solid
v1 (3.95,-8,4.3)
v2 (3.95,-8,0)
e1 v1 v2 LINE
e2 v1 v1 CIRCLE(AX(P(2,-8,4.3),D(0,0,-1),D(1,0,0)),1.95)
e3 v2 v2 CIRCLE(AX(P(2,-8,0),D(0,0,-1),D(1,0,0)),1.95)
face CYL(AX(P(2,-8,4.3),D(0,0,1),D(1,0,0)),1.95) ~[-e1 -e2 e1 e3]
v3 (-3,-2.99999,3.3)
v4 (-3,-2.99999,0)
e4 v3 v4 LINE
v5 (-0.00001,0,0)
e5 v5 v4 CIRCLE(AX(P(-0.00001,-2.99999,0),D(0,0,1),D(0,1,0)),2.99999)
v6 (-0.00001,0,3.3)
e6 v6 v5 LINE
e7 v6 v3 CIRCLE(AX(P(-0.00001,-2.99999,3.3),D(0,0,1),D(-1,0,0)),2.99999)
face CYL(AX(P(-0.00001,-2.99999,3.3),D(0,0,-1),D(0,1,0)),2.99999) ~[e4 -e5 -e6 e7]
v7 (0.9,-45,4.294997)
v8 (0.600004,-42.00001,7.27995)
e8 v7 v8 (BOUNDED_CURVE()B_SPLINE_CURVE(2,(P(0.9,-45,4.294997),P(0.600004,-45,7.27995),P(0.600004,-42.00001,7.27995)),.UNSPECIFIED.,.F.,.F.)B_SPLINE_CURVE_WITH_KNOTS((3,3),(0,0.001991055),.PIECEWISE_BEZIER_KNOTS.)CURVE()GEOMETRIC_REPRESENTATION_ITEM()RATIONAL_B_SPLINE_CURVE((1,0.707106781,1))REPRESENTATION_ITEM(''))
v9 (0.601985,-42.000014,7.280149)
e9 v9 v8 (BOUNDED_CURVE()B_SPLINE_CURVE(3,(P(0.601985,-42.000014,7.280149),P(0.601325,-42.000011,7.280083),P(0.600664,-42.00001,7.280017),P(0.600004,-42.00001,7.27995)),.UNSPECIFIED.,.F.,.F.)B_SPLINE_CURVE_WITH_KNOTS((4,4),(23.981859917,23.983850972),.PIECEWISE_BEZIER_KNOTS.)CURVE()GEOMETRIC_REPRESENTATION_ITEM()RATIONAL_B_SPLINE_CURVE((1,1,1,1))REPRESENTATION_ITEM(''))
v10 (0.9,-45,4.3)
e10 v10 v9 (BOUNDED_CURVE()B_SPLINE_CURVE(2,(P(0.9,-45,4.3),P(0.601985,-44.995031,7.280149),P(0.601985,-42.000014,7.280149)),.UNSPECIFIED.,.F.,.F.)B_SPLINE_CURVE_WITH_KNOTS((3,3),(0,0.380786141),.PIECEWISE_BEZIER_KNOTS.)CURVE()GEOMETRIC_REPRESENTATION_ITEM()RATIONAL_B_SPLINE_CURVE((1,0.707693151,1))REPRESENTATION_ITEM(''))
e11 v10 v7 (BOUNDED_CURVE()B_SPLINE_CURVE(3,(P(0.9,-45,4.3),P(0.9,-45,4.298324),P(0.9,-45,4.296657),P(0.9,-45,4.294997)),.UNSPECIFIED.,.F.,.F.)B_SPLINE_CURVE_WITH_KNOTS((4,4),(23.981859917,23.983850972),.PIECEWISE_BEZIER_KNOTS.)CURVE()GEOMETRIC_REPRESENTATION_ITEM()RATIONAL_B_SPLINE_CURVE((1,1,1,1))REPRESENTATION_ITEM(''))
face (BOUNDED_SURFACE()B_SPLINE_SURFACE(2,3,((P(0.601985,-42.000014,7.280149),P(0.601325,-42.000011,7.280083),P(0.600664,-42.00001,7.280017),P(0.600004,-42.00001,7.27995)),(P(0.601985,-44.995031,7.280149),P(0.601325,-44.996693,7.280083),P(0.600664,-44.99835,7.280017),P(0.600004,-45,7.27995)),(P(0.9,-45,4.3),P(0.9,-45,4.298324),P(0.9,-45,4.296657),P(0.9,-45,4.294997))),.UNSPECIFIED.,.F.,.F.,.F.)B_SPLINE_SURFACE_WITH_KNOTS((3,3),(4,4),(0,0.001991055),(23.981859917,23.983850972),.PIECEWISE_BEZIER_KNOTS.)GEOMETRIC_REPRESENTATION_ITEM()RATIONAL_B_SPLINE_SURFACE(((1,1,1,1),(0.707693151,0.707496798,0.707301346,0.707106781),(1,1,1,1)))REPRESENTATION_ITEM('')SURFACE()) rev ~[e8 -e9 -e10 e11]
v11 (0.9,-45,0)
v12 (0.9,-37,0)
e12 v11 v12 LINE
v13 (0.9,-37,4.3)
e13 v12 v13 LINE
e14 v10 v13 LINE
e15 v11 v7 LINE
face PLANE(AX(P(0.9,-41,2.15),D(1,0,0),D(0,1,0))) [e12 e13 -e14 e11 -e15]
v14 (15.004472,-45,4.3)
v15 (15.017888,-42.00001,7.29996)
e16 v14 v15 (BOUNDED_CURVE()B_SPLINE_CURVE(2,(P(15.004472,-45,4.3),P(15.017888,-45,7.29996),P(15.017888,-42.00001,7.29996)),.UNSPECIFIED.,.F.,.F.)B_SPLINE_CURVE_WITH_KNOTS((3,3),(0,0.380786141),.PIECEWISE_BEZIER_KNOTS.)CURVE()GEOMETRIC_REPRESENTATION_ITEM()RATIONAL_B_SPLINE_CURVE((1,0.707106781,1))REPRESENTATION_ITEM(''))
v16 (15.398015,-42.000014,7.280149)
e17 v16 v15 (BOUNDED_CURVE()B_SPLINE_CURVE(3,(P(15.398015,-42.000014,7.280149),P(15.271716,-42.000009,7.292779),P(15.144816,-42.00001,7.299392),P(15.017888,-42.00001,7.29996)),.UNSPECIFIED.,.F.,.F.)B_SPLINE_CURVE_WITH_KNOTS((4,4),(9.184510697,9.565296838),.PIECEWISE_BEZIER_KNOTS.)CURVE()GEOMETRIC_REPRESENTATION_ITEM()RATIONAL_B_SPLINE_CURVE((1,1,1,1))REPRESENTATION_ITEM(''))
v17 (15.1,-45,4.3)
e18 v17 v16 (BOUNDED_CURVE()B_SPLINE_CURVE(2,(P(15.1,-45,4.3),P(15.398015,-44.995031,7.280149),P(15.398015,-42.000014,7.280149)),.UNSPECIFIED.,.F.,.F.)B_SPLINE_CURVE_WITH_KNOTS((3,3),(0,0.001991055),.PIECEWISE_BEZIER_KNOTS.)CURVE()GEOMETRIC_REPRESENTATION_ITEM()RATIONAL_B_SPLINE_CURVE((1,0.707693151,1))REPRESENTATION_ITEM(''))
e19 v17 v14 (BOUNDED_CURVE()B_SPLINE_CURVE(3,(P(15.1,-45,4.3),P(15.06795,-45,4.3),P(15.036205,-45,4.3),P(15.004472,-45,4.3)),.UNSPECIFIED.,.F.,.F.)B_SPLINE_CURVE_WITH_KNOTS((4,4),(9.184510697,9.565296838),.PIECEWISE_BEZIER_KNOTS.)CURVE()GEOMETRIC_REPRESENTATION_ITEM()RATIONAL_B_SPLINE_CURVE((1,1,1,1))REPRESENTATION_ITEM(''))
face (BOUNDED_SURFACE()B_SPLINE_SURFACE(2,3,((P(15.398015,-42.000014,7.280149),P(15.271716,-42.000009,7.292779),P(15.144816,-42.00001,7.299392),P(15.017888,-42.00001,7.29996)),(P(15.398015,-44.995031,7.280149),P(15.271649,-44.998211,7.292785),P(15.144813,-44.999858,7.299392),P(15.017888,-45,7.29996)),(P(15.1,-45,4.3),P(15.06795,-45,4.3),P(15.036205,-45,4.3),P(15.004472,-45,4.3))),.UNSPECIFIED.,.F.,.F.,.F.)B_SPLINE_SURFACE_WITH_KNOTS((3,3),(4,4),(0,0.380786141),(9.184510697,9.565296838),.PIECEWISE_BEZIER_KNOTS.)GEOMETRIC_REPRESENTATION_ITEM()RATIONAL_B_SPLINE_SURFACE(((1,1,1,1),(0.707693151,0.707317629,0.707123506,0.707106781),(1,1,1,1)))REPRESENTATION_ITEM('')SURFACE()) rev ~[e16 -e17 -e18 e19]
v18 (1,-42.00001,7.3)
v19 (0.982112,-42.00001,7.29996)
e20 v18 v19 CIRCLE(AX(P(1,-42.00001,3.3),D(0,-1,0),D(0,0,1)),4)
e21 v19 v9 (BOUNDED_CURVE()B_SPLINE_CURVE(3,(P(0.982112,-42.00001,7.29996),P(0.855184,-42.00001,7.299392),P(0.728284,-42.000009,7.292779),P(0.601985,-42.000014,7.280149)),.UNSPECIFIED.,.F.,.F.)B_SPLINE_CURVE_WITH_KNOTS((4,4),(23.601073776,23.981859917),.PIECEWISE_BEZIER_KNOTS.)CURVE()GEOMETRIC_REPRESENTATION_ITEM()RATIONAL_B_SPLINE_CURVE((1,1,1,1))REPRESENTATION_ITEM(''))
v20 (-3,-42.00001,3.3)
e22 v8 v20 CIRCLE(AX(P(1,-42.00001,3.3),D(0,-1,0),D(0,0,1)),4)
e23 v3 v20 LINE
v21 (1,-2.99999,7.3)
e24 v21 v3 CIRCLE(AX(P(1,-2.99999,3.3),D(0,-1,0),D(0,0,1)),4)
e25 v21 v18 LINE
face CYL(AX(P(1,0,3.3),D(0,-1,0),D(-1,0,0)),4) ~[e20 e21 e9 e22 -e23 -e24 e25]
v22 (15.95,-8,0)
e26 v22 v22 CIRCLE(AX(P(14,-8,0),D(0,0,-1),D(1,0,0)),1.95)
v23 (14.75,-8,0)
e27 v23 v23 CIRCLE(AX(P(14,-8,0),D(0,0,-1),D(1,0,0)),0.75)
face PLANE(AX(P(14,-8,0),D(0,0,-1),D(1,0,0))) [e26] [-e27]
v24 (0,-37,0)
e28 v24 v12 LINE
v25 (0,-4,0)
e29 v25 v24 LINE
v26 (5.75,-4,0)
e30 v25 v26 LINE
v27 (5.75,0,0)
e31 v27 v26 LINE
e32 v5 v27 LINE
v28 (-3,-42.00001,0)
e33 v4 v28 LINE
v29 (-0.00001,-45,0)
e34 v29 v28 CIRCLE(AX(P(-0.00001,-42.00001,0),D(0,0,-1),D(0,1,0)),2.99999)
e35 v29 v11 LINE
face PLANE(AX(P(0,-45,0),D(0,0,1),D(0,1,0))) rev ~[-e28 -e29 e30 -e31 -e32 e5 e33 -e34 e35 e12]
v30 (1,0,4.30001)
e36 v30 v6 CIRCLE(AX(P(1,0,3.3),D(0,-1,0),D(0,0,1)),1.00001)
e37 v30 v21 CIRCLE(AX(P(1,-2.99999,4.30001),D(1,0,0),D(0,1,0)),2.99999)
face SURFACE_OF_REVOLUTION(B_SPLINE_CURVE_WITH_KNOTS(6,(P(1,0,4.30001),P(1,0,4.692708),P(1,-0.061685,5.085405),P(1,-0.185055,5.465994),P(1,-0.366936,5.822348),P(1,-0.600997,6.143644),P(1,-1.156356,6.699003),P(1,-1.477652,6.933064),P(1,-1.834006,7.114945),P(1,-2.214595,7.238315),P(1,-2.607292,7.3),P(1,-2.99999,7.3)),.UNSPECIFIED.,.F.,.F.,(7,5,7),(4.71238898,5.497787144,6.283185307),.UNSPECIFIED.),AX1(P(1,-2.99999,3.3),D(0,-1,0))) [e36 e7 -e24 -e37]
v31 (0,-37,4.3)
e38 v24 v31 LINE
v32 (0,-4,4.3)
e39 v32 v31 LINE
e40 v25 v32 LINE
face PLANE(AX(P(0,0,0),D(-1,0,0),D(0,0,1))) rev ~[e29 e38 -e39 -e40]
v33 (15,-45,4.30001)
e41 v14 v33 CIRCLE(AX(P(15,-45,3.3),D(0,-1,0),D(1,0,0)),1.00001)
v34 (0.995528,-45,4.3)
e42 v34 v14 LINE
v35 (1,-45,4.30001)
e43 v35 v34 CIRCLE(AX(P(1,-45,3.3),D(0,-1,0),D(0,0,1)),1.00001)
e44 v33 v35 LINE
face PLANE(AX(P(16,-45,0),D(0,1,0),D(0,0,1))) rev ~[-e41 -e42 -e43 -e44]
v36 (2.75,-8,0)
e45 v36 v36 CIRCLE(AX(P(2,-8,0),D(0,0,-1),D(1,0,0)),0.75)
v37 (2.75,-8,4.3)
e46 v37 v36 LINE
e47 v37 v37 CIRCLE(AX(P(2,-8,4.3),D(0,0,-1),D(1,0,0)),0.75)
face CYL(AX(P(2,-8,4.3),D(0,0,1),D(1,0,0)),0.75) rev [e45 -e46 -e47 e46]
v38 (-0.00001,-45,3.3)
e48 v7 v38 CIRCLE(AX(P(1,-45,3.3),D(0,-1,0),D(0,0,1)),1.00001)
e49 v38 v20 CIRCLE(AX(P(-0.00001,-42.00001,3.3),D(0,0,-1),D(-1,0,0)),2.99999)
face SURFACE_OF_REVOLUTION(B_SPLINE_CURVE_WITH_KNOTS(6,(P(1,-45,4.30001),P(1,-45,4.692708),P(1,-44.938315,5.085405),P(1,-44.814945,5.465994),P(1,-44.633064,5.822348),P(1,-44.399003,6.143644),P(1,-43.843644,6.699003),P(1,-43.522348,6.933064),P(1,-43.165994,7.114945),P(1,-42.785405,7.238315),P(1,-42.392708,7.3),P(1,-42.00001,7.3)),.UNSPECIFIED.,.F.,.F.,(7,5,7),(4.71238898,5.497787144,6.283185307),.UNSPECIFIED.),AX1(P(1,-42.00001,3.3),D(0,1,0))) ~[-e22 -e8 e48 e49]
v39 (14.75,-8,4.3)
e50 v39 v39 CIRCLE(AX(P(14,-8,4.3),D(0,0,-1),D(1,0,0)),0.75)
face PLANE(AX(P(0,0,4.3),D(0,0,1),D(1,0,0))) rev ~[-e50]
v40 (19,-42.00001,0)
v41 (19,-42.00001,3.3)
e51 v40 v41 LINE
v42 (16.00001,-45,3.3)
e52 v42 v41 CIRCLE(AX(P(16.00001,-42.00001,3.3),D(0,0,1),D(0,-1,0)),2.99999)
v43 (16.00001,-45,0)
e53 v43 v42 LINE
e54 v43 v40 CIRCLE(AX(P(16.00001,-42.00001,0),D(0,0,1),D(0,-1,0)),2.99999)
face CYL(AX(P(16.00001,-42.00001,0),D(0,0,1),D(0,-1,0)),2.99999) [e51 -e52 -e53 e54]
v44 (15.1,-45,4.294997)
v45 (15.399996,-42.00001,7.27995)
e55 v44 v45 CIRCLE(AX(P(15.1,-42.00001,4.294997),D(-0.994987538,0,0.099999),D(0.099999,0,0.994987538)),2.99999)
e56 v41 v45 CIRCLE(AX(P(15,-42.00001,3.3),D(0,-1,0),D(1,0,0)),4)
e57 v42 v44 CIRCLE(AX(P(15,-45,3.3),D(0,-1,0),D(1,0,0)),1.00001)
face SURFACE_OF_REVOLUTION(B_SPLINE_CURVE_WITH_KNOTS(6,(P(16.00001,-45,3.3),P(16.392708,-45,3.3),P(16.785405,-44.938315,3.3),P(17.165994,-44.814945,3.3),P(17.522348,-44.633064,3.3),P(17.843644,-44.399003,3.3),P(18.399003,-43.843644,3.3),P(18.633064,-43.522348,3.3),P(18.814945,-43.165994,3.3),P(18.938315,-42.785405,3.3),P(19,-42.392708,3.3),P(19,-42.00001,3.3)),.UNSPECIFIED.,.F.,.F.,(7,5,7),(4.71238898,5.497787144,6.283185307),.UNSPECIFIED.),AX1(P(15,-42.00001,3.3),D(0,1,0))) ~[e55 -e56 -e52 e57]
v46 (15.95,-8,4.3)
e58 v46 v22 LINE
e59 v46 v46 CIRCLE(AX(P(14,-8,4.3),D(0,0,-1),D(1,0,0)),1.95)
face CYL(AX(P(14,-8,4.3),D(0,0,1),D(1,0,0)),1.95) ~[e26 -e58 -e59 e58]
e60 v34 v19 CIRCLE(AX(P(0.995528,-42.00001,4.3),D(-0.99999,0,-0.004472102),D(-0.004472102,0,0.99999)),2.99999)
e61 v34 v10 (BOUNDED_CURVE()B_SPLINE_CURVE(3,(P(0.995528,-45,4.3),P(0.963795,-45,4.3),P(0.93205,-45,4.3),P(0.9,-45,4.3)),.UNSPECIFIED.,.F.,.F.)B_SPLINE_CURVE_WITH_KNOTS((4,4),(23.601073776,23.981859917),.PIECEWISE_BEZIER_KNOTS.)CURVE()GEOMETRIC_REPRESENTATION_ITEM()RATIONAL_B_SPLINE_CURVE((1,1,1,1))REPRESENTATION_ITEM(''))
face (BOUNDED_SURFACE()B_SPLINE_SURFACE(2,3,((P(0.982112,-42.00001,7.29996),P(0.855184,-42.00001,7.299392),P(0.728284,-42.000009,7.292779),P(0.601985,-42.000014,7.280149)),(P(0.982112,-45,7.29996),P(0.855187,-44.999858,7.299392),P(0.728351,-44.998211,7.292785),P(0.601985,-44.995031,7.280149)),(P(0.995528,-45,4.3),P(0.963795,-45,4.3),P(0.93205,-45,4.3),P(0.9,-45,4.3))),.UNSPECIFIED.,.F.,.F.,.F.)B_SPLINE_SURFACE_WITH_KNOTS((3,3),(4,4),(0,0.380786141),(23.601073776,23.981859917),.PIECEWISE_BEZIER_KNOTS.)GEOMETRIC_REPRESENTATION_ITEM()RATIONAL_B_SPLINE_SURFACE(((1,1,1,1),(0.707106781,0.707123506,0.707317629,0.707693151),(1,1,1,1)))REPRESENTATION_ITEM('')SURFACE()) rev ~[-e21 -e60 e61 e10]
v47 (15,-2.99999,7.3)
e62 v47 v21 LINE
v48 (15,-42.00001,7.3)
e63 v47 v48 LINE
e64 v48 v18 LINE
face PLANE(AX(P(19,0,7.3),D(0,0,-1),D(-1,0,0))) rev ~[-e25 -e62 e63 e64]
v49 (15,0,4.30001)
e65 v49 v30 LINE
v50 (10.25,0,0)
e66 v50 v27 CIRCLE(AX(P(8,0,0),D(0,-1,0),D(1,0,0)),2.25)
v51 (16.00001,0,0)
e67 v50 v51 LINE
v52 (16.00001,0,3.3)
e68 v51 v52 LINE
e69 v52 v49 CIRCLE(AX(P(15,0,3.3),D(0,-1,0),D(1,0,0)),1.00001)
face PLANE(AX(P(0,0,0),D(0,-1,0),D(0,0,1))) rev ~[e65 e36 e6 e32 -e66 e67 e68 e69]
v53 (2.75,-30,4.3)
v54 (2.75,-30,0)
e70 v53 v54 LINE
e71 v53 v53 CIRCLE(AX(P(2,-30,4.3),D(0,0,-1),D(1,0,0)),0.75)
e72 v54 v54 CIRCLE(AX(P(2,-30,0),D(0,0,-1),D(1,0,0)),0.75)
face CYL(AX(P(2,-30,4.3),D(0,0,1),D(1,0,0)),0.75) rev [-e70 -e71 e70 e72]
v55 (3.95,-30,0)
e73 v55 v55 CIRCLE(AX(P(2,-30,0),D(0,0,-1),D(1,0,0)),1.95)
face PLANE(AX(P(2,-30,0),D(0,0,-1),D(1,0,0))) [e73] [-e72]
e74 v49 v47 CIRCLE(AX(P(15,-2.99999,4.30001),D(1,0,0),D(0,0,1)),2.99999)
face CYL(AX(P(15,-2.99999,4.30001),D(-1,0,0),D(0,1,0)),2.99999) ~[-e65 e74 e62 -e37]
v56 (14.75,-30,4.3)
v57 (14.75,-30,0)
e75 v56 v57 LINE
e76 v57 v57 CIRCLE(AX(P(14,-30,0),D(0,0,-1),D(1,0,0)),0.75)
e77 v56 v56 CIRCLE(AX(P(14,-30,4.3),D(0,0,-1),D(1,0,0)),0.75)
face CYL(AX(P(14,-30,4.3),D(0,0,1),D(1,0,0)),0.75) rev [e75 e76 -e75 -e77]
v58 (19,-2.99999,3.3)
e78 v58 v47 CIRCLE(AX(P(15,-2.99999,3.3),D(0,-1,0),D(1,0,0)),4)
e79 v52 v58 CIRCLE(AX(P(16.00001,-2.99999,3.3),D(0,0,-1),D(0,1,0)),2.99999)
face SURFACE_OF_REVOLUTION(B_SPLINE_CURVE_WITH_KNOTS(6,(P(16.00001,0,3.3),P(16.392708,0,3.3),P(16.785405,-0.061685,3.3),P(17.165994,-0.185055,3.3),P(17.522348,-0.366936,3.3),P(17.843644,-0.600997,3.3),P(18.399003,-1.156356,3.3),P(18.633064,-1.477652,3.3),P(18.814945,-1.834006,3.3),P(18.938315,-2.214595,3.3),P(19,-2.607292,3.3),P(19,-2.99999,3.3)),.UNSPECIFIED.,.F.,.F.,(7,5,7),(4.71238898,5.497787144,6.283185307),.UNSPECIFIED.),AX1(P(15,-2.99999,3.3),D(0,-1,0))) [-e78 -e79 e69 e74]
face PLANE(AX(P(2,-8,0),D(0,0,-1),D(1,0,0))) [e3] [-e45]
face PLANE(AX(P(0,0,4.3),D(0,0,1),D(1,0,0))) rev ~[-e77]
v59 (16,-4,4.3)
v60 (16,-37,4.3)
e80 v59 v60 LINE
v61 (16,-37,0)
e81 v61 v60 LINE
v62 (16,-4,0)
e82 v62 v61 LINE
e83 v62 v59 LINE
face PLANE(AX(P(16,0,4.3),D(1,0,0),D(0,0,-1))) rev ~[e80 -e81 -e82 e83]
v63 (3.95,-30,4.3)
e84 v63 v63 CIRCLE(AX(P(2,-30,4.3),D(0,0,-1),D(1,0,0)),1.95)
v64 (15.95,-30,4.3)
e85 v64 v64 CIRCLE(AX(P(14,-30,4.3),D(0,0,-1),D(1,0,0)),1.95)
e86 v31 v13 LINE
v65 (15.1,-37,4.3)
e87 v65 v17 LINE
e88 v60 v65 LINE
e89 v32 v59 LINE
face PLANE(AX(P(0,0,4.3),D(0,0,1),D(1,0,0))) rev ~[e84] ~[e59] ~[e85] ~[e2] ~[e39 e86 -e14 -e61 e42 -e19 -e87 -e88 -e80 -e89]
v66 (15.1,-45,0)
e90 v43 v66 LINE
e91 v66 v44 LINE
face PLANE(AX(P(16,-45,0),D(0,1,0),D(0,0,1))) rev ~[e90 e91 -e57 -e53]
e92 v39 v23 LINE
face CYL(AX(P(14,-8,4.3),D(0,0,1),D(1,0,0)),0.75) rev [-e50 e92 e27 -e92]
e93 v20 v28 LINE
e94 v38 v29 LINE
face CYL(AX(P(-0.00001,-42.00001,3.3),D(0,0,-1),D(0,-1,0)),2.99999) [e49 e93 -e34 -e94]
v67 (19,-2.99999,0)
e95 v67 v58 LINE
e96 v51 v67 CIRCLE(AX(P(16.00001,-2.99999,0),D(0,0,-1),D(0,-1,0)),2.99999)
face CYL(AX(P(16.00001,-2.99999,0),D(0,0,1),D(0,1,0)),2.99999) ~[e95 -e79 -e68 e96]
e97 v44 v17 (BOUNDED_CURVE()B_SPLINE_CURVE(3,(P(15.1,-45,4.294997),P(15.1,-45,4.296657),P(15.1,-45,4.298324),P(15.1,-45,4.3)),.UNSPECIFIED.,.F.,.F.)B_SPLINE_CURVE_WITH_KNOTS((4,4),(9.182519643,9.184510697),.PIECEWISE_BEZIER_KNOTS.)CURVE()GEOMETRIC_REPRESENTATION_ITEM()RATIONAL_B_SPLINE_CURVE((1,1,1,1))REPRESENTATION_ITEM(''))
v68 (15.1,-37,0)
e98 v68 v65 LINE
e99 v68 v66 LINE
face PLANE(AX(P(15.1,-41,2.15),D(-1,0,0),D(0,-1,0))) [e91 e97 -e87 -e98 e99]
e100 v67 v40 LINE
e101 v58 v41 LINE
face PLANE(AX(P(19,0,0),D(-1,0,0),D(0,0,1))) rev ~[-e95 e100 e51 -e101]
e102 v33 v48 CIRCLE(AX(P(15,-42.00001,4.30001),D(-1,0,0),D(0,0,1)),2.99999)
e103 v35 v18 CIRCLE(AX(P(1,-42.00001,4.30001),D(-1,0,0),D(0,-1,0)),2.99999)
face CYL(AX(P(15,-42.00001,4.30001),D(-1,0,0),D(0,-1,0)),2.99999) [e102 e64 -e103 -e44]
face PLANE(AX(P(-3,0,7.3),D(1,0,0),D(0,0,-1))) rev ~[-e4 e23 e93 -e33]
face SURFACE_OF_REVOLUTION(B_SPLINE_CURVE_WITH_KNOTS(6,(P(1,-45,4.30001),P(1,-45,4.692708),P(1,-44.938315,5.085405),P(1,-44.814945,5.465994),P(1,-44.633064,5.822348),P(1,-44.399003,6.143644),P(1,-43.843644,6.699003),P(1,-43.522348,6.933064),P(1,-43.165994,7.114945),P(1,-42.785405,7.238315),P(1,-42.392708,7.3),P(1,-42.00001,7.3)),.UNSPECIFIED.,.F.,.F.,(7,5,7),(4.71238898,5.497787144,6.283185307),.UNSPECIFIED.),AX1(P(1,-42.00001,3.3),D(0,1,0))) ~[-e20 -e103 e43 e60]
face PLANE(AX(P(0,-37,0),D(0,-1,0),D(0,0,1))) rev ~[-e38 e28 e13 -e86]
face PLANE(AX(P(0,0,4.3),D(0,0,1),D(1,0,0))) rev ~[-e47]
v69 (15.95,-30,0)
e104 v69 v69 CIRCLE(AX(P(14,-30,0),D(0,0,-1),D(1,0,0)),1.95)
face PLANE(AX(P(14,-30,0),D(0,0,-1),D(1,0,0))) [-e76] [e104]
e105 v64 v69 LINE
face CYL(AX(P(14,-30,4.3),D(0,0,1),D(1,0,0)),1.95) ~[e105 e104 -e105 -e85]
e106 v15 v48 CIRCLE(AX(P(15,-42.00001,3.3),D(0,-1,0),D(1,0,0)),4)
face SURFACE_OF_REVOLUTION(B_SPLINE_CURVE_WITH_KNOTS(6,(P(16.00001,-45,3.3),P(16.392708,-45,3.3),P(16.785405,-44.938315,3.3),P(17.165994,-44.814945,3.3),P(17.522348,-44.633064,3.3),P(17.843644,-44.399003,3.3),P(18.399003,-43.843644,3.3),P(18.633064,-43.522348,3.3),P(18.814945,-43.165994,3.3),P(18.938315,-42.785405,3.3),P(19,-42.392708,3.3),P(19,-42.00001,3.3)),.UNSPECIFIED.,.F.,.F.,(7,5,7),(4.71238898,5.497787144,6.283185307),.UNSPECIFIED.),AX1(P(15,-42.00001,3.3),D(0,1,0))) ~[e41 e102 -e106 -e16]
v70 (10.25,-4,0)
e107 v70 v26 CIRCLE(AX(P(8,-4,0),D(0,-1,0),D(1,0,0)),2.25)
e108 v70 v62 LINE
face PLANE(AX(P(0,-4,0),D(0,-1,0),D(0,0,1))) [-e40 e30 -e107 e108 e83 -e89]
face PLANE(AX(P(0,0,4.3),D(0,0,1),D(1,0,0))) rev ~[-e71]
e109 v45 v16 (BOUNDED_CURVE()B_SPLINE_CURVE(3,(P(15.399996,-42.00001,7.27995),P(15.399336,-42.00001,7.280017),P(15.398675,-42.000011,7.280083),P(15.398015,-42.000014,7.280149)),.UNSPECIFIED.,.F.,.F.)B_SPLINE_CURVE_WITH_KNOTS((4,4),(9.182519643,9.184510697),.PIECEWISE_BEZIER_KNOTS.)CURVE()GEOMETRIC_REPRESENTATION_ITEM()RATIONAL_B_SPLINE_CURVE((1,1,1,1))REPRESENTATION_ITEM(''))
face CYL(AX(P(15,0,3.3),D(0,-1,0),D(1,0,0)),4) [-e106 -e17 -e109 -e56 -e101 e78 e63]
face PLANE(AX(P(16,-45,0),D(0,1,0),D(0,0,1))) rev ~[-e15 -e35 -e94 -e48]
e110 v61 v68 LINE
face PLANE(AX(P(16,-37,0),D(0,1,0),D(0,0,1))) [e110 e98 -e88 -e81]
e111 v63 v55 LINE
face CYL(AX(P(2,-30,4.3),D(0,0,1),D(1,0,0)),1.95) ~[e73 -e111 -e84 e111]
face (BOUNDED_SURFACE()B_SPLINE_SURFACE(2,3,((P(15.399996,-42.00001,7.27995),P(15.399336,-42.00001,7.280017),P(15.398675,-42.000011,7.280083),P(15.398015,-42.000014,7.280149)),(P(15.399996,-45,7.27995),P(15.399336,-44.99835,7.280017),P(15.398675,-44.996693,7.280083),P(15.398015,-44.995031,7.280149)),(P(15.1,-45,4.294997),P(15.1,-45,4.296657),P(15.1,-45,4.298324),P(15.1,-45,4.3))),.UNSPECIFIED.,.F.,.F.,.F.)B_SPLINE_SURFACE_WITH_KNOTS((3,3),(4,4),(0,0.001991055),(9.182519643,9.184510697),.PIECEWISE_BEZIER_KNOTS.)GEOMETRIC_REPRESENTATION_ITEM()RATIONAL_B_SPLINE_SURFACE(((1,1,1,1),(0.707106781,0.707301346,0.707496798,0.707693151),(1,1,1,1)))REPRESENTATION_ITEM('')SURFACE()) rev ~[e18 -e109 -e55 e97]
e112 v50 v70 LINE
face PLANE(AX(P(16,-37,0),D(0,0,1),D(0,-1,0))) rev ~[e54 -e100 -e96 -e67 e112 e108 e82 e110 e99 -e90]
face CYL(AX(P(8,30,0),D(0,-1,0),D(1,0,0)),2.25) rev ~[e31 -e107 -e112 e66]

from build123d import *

# Parameters (mm, degrees)
F1_DEPTH  = 45
F3_W      = 4
F3_H      = 4.3
F4_DEPTH  = 16
F6_D      = 4.5
F6_DEPTH  = 30
F6_TIP    = 1.3519363928
F8_R      = 4
F11_W     = 8
F11_H     = 4.3
F12_DEPTH = 0.9
F13_W     = 8
F13_H     = 4.3
F14_DEPTH = 0.9
F15_R     = 2.99999
F2_R      = 1.95
F2_R_2    = 0.75
F16_DEPTH = 4.3


# Not quite as in the source:
# - a fillet or chamfer is up to 0.001 mm smaller than in the source, because OpenCascade refuses the exact size


with BuildPart() as f1:
    # F0 (on Front) → F1 (new body)
    with BuildSketch(Plane.XZ):
        Polygon((0, 0), (0, 4.3), (16, 4.3), (16, 0), (19, 0), (19, 7.3), (-3, 7.3), (-3, 0), align=None)
    extrude(amount=F1_DEPTH)

    # F3 (on face) → F4 (join)
    with BuildSketch(Plane.YZ):
        with Locations((-2, 2.15)):
            Rectangle(F3_W, F3_H)
    extrude(amount=F4_DEPTH)

    # F6
    with Locations(Plane(origin=(0, 0, 0), x_dir=(-1, 0, 0), z_dir=(0, 1, 0))):
        with Locations((-8, 0)):
            Hole(F6_D / 2, depth=F6_DEPTH)
            with Locations((0, 0, -(F6_DEPTH + F6_TIP / 2))):  # 118° drill point
                Cone(0, F6_D / 2, F6_TIP, mode=Mode.SUBTRACT)


with BuildPart() as f7_1:
    # F7: copy of F1
    add(f1.part.moved(Location((31.9, 0.1, 0))))


with BuildPart() as f1_1:
    add(f1.part)

    # F8
    f8_edges = [f1_1.edges().sort_by_distance(p)[0] for p in [
        (-3, -22.5, 7.3),
        (19, -22.5, 7.3),
    ]]
    fillet(f8_edges, radius=F8_R)


with BuildPart() as f10_1:
    # F10: copy of F1
    add(f1_1.part.moved(Location((35.6, 1.7, 0))))


with BuildPart() as f1_2:
    add(f1_1.part)

    # F11 (on face) → F12 (join)
    with BuildSketch(Plane.YZ):
        with Locations((-41, 2.15)):
            Rectangle(F11_W, F11_H)
    extrude(amount=F12_DEPTH)

    # F13 (on face) → F14 (join)
    with BuildSketch(Plane(origin=(16, 0, 0), x_dir=(0, -1, 0), z_dir=(-1, 0, 0))):
        with Locations((41, 2.15)):
            Rectangle(F13_W, F13_H)
    extrude(amount=F14_DEPTH)

    # F15 (radius 3 in the source; OpenCascade refuses exactly that, so slightly less here)
    f15_edges = [f1_2.edges().sort_by_distance(p)[0] for p in [
        (8, -45, 7.3),
        (8, 0, 7.3),
    ]]
    fillet(f15_edges, radius=F15_R)

    # F2 (on face) → F16 (join)
    with BuildSketch(Plane(origin=(0, 0, 4.3), x_dir=(1, 0, 0), z_dir=(0, 0, -1))):
        with Locations((2, 30)):
            Circle(F2_R)
        with Locations((2, 30)):
            Circle(F2_R_2, mode=Mode.SUBTRACT)
        with Locations((14, 30)):
            Circle(F2_R)
        with Locations((14, 30)):
            Circle(F2_R_2, mode=Mode.SUBTRACT)
        with Locations((2, 8)):
            Circle(F2_R)
        with Locations((2, 8)):
            Circle(F2_R_2, mode=Mode.SUBTRACT)
        with Locations((14, 8)):
            Circle(F2_R)
        with Locations((14, 8)):
            Circle(F2_R_2, mode=Mode.SUBTRACT)
    extrude(amount=F16_DEPTH)


solid = f1_2.part
